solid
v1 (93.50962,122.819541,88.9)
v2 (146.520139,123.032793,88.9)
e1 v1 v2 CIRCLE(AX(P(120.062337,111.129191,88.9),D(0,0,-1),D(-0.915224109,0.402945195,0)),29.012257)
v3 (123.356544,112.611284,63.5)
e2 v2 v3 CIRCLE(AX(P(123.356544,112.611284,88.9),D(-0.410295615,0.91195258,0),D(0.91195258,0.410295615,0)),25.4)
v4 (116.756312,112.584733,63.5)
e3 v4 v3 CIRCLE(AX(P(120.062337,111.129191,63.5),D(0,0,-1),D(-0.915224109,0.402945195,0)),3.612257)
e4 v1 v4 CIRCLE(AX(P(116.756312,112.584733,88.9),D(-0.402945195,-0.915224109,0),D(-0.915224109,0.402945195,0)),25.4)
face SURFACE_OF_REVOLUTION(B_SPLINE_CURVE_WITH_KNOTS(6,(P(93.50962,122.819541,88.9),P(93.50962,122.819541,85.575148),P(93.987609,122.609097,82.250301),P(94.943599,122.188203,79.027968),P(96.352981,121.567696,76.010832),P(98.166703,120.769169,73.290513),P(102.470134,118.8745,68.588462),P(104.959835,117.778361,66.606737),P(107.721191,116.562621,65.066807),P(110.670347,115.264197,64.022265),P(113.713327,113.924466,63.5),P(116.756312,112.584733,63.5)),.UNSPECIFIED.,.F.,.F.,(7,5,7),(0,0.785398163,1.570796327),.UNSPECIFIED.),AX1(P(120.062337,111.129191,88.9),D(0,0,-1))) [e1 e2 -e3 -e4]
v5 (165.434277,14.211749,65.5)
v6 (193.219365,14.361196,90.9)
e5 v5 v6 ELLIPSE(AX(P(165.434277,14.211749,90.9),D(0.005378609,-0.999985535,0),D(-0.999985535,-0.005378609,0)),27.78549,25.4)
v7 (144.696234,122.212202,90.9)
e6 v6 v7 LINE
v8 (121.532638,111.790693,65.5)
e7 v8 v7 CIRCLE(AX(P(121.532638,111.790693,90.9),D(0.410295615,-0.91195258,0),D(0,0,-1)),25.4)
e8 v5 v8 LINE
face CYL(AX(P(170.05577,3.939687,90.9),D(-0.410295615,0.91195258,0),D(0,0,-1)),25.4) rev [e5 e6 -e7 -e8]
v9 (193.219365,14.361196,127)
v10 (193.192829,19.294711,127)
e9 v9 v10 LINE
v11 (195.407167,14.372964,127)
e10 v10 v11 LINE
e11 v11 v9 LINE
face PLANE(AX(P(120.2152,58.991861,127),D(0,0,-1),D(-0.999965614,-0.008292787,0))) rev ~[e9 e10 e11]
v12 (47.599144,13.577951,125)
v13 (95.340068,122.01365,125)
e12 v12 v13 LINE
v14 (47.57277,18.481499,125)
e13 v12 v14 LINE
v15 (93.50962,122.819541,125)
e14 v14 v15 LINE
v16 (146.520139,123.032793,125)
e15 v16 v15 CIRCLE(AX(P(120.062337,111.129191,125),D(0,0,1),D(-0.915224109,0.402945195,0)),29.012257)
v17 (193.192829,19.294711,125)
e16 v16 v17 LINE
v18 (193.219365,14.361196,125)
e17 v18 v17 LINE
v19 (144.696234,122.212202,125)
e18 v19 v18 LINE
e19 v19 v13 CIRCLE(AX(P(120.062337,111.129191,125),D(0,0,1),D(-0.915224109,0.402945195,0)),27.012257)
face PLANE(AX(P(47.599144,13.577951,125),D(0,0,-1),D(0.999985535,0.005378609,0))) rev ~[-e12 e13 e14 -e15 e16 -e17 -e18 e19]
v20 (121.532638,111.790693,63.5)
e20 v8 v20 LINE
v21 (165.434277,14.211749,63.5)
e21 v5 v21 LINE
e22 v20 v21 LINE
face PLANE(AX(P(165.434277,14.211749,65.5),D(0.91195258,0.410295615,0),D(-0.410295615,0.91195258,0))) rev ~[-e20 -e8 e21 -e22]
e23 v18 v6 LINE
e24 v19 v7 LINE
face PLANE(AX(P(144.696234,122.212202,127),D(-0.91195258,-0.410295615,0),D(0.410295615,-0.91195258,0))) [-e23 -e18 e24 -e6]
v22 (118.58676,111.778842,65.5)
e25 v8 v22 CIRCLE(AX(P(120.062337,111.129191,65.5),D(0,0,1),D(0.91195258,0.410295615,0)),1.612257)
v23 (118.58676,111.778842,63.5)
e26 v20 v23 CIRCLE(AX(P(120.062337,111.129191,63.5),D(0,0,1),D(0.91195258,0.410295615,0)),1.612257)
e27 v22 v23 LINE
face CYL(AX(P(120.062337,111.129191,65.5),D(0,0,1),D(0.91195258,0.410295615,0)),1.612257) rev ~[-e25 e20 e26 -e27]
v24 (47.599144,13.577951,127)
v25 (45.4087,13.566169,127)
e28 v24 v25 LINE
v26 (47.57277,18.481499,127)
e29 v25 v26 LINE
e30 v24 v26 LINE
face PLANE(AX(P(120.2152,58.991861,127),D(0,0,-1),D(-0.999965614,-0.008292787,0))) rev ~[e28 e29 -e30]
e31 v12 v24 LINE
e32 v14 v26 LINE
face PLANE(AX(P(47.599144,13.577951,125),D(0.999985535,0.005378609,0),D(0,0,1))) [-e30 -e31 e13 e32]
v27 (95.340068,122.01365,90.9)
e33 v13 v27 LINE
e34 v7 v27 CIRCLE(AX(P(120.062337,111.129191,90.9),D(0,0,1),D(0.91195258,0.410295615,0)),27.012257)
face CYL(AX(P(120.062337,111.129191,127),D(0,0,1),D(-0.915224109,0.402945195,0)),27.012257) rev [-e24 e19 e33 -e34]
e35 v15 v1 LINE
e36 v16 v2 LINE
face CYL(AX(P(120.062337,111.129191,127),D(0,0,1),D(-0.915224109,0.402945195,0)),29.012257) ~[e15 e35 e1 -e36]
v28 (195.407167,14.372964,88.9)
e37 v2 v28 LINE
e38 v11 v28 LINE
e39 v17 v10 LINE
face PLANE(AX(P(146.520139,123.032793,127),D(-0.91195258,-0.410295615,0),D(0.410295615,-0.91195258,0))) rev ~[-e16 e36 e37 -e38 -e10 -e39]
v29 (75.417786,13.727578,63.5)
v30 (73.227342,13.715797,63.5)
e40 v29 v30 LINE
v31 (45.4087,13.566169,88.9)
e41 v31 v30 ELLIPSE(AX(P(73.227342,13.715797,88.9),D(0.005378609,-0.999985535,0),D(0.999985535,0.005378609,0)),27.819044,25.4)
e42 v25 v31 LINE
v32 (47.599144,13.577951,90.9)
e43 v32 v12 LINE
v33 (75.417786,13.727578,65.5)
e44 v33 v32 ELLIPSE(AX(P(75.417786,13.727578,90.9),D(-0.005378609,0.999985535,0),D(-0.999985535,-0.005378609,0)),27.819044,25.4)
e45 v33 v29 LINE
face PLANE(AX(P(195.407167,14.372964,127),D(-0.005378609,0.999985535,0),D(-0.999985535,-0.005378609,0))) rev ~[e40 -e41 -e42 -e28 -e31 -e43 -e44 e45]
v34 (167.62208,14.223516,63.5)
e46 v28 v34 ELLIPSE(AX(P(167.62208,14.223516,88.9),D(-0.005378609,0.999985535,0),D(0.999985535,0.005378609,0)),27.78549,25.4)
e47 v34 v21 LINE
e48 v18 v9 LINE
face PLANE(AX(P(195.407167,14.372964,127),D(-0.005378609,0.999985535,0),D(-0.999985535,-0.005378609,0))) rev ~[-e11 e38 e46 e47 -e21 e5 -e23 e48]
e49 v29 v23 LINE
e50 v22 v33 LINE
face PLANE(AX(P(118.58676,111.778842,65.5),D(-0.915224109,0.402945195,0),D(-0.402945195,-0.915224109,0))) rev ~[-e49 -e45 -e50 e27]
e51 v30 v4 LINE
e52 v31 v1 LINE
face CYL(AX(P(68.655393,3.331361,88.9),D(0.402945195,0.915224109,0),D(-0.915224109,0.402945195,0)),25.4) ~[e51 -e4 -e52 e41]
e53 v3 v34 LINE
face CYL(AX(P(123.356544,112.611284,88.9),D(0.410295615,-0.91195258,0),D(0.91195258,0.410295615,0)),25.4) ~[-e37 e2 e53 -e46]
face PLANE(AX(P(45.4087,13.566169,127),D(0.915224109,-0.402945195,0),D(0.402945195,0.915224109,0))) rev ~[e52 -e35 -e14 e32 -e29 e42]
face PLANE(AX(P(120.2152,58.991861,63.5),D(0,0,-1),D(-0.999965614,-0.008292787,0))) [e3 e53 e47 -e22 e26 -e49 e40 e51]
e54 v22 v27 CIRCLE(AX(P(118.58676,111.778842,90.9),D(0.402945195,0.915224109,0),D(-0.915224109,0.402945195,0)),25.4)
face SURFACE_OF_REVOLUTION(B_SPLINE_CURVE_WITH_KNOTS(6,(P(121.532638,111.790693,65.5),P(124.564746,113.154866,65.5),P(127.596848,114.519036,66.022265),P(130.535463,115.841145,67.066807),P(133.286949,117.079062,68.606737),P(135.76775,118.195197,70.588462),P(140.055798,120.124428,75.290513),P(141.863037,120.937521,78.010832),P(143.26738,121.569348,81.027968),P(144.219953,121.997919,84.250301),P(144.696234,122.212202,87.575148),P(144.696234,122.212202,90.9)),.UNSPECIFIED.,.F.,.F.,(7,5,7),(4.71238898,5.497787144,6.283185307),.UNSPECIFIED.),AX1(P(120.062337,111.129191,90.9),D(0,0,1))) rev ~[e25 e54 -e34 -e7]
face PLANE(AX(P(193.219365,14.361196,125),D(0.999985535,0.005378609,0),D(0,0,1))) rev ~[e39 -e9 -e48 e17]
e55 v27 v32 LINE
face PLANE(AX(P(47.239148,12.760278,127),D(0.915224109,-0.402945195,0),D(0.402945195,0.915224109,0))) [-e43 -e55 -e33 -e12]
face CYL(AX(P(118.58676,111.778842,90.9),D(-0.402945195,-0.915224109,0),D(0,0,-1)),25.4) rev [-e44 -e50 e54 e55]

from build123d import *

# Parameters (mm, degrees)
F1_DEPTH = 63.5
F2_T     = -2
F3_R     = 25.4
F4_ANGLE = 180
F5_ANGLE = -48
F6_W     = 145.6223272032
F6_H     = 2
F7_DEPTH = 127
F8_DEPTH = 25.4


# Not quite as in the source:
# - a feature names something its author has since deleted; it is built from what else it names


with BuildPart() as f1:
    # F0 (on Top) → F1 (new body)
    with BuildSketch(Plane.XY):
        with BuildLine():
            Line((-10.2850095064, 143.0450051312), (-58.2692639971, 33.9835022184))
            Line((-58.2692639971, 33.9835022184), (91.7307360029, 34.4206405823))
            Line((91.7307360029, 34.4206405823), (42.7254554371, 143.2713651338))
            ThreePointArc((42.7254554371, 143.2713651338), (44.5808039736, 137.7049772305), (45.2782310553, 131.8791221047))
            Line((45.2782310553, 131.8791221047), (45.4024820726, 131.3612216192))
            Line((45.4024820726, 131.3612216192), (45.2828539684, 131.3612216192))
            ThreePointArc((45.2828539684, 131.3612216192), (16.2705971829, 102.3489648337), (-12.7416596027, 131.3612216192))
            ThreePointArc((-12.7416596027, 131.3612216192), (-12.1208550885, 137.3308515669), (-10.2850095064, 143.0450051312))
        make_face()
        with BuildLine():
            ThreePointArc((42.7254554371, 143.2713651338), (16.1467130657, 160.3732139071), (-10.2850095064, 143.0450051312))
            ThreePointArc((-10.2850095064, 143.0450051312), (-12.1208550885, 137.3308515669), (-12.7416596027, 131.3612216192))
            Line((-12.7416596027, 131.3612216192), (45.2828539684, 131.3612216192))
            ThreePointArc((45.2828539684, 131.3612216192), (45.2816982171, 131.6201821781), (45.2782310553, 131.8791221047))
            ThreePointArc((45.2782310553, 131.8791221047), (44.5808039736, 137.7049772305), (42.7254554371, 143.2713651338))
        make_face()
        with BuildLine():
            Line((45.2828539684, 131.3612216192), (-12.7416596027, 131.3612216192))
            ThreePointArc((-12.7416596027, 131.3612216192), (16.2705971829, 102.3489648337), (45.2828539684, 131.3612216192))
        make_face()
        with BuildLine():
            Line((45.4024820726, 131.3612216192), (45.2782310553, 131.8791221047))
            ThreePointArc((45.2782310553, 131.8791221047), (45.2816982171, 131.6201821781), (45.2828539684, 131.3612216192))
            Line((45.2828539684, 131.3612216192), (45.4024820726, 131.3612216192))
        make_face()
    extrude(amount=F1_DEPTH)

    # F2
    f2_openings = [f1.faces().sort_by_distance(p)[0] for p in [
        (16.730736, 34.202071, 31.75),
    ]]
    offset(amount=F2_T, openings=f2_openings)

    # F3
    f3_edges = [f1.edges().sort_by_distance(p)[0] for p in [
        (16.146713, 160.373214, 63.5),
        (16.155253, 158.373232, 61.5),
    ]]
    fillet(f3_edges, radius=F3_R)


with BuildPart() as f1_1:
    # F4: moved
    add(f1.part.rotate(Axis((41.7381236511, 83.5918491789, 63.5), (-0.4105210981, 0.9118510997, 0)), F4_ANGLE))


with BuildPart() as f1_2:
    # F5: moved
    add(f1_1.part.rotate(Axis((45.4087001389, 13.5661687977, 95.25), (0, 0, 1)), F5_ANGLE))

    # F6 (on face) → F7 (cut)
    with BuildSketch(Plane(origin=(-0.0716524101, 13.3215442397, 0), x_dir=(0.9999855352, 0.0053786087, 0), z_dir=(0.0053786087, -0.9999855352, 0))):
        with Locations((120.4826499572, 126)):
            Rectangle(F6_W, F6_H)
    extrude(amount=-F7_DEPTH, mode=Mode.SUBTRACT)

    # F8 (cut): a face of the model
    f8_faces = [f1_2.faces().sort_by_distance(p)[0] for p in [
        (120.299637411, 47.6367123165, 65.5),
    ]]
    extrude(f8_faces, amount=-F8_DEPTH, mode=Mode.SUBTRACT)


solid = f1_2.part
